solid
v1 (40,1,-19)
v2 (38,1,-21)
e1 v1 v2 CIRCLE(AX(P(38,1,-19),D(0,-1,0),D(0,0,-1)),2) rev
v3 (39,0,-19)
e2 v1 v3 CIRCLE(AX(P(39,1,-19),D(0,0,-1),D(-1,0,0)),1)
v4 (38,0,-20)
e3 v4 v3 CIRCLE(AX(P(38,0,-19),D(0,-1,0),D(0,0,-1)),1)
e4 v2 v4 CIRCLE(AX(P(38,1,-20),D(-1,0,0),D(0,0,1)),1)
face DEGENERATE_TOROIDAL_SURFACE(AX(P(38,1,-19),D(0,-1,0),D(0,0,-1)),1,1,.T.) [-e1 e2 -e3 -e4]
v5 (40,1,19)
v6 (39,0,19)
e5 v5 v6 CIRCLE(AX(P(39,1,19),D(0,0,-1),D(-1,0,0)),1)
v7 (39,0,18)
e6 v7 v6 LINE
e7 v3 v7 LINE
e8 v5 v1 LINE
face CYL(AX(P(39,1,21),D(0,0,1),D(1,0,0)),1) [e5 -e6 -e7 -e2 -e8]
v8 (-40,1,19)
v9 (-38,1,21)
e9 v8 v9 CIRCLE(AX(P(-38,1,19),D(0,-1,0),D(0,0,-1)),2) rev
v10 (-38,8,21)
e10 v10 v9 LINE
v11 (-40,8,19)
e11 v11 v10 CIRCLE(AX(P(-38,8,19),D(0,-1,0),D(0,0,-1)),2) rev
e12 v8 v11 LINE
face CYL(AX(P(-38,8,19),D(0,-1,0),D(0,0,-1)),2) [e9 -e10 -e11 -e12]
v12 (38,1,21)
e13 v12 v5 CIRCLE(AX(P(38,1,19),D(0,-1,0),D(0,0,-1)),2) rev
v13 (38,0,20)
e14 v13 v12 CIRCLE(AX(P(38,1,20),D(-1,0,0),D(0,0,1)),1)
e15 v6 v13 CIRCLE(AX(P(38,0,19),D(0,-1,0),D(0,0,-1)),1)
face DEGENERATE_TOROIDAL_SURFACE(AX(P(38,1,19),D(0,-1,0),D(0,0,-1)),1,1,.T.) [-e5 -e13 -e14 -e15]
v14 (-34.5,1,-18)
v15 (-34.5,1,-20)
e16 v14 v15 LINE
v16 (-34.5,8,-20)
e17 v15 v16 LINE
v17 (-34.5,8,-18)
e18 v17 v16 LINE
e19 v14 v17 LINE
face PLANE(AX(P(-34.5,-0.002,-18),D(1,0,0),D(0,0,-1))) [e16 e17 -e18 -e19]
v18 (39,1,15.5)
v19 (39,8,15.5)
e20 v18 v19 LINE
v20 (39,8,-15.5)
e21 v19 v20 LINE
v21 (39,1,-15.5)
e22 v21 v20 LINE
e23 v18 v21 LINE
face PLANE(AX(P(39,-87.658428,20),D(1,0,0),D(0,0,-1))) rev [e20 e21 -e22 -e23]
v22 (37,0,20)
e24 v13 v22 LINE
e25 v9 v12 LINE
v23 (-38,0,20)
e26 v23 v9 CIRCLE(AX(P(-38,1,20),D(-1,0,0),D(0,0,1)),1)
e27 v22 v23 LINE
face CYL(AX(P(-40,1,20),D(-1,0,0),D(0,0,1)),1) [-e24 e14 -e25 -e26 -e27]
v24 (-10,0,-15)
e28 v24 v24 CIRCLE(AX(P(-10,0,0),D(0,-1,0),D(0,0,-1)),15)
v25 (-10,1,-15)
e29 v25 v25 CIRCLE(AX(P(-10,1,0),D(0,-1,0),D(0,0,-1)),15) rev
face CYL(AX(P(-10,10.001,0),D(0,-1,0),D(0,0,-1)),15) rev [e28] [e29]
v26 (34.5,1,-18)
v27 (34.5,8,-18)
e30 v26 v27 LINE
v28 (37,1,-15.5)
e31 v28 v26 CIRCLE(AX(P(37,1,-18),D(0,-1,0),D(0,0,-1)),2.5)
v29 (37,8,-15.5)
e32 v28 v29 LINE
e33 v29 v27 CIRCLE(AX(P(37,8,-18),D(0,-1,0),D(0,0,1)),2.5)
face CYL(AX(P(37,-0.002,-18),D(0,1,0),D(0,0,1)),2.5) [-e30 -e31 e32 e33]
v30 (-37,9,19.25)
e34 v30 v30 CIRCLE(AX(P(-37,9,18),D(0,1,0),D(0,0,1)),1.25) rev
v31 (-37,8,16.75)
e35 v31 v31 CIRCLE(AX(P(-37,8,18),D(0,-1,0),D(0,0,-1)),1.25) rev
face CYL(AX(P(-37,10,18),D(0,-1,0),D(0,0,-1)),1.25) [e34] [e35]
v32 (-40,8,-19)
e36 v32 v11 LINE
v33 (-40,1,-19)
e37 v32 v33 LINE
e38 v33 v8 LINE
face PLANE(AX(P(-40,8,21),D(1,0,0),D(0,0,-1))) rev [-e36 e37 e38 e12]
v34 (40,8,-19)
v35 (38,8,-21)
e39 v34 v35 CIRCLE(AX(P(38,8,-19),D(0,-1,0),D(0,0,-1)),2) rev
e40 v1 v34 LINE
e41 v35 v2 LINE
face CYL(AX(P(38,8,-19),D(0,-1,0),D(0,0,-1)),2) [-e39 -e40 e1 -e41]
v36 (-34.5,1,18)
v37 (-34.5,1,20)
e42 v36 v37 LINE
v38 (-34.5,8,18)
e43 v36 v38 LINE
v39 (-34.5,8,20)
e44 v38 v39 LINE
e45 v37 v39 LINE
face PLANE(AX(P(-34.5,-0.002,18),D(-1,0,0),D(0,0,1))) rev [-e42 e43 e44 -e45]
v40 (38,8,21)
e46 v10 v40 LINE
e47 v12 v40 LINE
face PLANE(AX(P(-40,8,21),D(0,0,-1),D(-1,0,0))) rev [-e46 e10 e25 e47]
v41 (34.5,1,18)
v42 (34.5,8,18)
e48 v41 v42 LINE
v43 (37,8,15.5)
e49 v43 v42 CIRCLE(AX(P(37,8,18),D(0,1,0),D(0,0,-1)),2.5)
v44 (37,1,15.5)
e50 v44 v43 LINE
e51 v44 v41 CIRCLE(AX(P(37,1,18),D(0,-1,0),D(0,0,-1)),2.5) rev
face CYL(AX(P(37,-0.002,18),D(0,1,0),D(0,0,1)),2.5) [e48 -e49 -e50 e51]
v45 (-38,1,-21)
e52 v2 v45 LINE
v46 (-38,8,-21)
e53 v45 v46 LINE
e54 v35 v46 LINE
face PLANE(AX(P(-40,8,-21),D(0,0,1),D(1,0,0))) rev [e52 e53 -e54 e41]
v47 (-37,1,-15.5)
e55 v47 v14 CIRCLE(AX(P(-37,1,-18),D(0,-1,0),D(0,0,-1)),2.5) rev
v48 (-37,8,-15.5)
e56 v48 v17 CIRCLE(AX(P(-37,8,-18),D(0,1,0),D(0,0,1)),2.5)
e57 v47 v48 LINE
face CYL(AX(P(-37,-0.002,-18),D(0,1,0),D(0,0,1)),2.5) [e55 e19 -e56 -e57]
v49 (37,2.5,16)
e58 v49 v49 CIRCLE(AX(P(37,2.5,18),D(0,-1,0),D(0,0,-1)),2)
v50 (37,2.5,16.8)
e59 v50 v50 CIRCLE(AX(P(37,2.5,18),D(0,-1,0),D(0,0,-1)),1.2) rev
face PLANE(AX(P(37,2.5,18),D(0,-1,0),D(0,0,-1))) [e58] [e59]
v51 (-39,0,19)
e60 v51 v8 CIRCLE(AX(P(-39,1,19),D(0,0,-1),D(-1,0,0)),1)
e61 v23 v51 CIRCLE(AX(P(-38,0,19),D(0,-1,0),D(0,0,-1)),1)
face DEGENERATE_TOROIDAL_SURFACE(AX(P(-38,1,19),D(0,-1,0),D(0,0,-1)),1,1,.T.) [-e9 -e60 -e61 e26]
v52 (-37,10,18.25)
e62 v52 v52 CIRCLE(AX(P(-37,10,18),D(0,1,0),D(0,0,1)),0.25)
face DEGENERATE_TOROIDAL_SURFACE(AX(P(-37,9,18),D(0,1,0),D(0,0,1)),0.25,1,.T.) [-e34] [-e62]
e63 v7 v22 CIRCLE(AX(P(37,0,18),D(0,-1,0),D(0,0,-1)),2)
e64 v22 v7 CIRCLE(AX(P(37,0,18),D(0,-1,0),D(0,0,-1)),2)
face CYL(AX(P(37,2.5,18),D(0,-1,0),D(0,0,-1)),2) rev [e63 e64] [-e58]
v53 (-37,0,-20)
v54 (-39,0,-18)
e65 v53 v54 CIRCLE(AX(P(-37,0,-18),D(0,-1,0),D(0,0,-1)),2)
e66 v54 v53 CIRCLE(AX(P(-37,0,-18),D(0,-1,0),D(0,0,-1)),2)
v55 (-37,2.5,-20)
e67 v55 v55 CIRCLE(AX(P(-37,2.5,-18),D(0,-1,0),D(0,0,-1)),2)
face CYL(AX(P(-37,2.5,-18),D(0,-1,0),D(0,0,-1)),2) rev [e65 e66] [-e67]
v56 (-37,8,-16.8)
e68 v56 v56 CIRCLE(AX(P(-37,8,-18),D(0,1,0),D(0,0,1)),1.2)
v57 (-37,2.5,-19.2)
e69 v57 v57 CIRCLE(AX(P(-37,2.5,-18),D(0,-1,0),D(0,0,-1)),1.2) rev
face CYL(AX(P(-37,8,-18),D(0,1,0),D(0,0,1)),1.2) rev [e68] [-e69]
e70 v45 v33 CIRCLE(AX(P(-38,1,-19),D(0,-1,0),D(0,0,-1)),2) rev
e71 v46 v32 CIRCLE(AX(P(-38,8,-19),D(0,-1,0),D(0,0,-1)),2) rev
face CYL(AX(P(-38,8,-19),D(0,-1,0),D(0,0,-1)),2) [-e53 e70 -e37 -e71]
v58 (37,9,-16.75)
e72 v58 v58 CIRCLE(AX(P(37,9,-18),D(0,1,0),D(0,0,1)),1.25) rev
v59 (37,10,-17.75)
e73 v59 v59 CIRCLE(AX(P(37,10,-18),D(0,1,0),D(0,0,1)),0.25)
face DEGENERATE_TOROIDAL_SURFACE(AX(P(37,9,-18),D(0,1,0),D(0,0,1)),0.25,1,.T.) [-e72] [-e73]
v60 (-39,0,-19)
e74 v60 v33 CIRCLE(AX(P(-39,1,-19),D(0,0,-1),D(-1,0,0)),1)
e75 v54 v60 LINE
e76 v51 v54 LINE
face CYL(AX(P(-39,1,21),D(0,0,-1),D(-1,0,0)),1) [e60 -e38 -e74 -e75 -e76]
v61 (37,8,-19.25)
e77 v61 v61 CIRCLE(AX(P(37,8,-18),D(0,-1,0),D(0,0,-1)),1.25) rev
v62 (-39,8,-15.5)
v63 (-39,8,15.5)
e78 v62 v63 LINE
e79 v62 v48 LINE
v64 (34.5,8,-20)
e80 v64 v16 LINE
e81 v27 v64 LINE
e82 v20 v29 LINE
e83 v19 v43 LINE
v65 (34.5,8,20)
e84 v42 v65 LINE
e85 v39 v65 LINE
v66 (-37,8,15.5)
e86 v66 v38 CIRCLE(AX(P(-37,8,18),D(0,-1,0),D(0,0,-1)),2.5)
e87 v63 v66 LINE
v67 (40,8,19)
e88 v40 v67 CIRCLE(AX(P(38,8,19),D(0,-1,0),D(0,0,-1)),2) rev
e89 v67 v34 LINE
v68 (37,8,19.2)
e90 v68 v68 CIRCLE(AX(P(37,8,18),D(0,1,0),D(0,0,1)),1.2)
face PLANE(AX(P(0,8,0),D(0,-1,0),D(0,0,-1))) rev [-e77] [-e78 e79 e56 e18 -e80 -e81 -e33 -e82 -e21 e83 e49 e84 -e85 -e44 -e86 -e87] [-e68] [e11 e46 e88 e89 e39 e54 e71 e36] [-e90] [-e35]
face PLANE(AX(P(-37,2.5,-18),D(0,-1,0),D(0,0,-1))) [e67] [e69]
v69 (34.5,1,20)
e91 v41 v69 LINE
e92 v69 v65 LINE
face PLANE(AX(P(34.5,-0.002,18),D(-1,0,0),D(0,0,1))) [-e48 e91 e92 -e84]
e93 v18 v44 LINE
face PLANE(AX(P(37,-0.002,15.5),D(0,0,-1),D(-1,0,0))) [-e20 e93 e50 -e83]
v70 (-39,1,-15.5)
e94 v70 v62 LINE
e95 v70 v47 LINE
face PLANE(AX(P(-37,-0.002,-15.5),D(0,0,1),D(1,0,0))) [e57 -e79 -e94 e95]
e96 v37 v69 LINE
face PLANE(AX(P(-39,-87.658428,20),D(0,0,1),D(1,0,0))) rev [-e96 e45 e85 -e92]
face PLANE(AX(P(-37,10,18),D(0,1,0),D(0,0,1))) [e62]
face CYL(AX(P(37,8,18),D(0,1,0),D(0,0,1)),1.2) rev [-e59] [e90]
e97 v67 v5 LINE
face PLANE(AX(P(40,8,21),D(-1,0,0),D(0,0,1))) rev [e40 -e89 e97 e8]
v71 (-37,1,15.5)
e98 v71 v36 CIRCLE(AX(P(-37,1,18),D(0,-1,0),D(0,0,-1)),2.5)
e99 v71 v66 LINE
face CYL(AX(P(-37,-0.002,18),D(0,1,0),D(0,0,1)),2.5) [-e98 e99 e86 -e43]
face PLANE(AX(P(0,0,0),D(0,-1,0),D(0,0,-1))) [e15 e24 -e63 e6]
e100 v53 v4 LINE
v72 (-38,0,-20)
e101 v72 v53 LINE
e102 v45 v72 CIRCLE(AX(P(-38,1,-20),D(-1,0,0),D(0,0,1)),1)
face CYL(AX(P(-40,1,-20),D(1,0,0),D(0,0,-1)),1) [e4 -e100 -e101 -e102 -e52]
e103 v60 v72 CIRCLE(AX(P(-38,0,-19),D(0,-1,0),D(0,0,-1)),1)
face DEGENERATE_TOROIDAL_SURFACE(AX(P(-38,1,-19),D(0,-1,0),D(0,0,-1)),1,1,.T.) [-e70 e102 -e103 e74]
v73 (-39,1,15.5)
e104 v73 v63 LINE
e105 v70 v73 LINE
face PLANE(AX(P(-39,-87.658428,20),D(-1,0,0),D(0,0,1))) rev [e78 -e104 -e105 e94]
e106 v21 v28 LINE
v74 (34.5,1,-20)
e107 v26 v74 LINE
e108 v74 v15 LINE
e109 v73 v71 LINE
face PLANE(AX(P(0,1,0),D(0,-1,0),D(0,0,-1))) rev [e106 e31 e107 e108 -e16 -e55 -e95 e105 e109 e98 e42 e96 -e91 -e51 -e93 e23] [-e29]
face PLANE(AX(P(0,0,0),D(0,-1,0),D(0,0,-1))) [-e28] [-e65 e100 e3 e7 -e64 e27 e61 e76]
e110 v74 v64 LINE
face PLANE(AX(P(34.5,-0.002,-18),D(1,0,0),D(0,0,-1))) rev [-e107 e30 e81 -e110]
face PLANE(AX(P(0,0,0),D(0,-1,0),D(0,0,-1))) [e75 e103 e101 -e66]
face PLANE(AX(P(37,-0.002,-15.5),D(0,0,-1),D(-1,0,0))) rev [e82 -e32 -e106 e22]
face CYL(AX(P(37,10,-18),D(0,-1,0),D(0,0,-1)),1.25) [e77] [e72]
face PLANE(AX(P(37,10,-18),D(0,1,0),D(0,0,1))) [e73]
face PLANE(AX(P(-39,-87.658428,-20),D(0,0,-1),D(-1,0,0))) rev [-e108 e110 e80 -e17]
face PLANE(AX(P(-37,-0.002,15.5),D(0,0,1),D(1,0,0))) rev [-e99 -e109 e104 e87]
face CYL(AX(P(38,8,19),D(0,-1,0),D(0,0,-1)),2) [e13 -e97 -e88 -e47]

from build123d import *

# Parameters (mm, degrees)
SKETCH1_W                                = 80
SKETCH1_H                                = 42
BOSS_EXTRUDE1_DEPTH                      = 8
SKETCH2_W                                = 78
SKETCH2_H                                = 40
CUT_EXTRUDE1_DEPTH                       = 7
FILLET1_R                                = 2
BOSS_EXTRUDE2_REACH                      = 47.88
MIRROR1_AT_THE_SECOND_PLANE_COPY_1_REACH = 47.88
M2_CLEARANCE_HOLE2_D                     = 2.4
SKETCH9_R                                = 2
CUT_EXTRUDE2_DEPTH                       = 2.5
SKETCH11_R                               = 1.25
BOSS_EXTRUDE3_DEPTH                      = 2
FILLET2_R                                = 1
FILLET3_R                                = 1
CUT_EXTRUDE3_REACH                       = 48.271
SKETCH12_R                               = 15


with BuildPart() as part:
    # Sketch1 → Boss-Extrude1 (new body)
    with BuildSketch(Plane(origin=(0, 0, 0), x_dir=(1, 0, 0), z_dir=(0, 1, 0))):
        Rectangle(SKETCH1_W, SKETCH1_H)
    extrude(amount=BOSS_EXTRUDE1_DEPTH)

    # Sketch2 → Cut-Extrude1 (cut)
    with BuildSketch(Plane(origin=(0, 8, 0), x_dir=(1, 0, 0), z_dir=(0, 1, 0))):
        Rectangle(SKETCH2_W, SKETCH2_H)
    extrude(amount=-CUT_EXTRUDE1_DEPTH, mode=Mode.SUBTRACT)

    # Fillet1
    fillet1_edges = [part.edges().sort_by_distance(p)[0] for p in [
        (-39, 4.5, -20),
        (-39, 4.5, 20),
        (39, 4.5, 20),
        (39, 4.5, -20),
        (40, 4, 21),
        (-40, 4, 21),
        (-40, 4, -21),
        (40, 4, -21),
    ]]
    fillet(fillet1_edges, radius=FILLET1_R)

    # Sketch3 → Boss-Extrude2 (add, up to next)
    with BuildSketch(Plane(origin=(0, 8, 0), x_dir=(1, 0, 0), z_dir=(0, 1, 0)), mode=Mode.PRIVATE) as boss_extrude2_sk1:
        with BuildLine():
            Line((-34.5, 18), (-34.5, 20))
            Line((-34.5, 20), (-37, 20))
            ThreePointArc((-37, 20), (-38.414213562, 19.414213562), (-39, 18))
            Line((-39, 18), (-39, 15.5))
            Line((-39, 15.5), (-37, 15.5))
            ThreePointArc((-37, 15.5), (-35.232233047, 16.232233047), (-34.5, 18))
        make_face()
    boss_extrude2_tool1 = extrude(boss_extrude2_sk1.sketch, amount=-BOSS_EXTRUDE2_REACH, mode=Mode.PRIVATE) - part.part
    boss_extrude2 = boss_extrude2_tool1.solids().sort_by_distance((-36.789939, 8, -17.789939))[0]
    add(boss_extrude2)

    # Mirror1: Boss-Extrude2 across plane
    add(boss_extrude2.mirror(Plane.XY))

    # Mirror1 at the second plane: Boss-Extrude2 across plane
    add(boss_extrude2.mirror(Plane(origin=(0, 0, 0), x_dir=(0, 0, 1), z_dir=(1, 0, 0))))

    # Mirror1 at the second plane copy 1 sketc → Mirror1 at the second plane copy 1 (add, up to next)
    with BuildSketch(Plane(origin=(0, 8, 0), x_dir=(-1, 0, 0), z_dir=(0, 1, 0)), mode=Mode.PRIVATE) as mirror1_at_the_second_plane_copy_1_sk1:
        with BuildLine():
            Line((-34.5, 18), (-34.5, 20))
            Line((-34.5, 20), (-37, 20))
            ThreePointArc((-37, 20), (-38.414213562, 19.414213562), (-39, 18))
            Line((-39, 18), (-39, 15.5))
            Line((-39, 15.5), (-37, 15.5))
            ThreePointArc((-37, 15.5), (-35.232233047, 16.232233047), (-34.5, 18))
        make_face()
    mirror1_at_the_second_plane_copy_1_tool1 = extrude(mirror1_at_the_second_plane_copy_1_sk1.sketch, amount=-MIRROR1_AT_THE_SECOND_PLANE_COPY_1_REACH, mode=Mode.PRIVATE) - part.part
    add(mirror1_at_the_second_plane_copy_1_tool1.solids().sort_by_distance((36.789939, 8, 17.789939))[0])

    # M2 Clearance Hole2 (through all)
    with Locations(Plane(origin=(-37, 8, -18), x_dir=(0, 0, 1), z_dir=(0, 1, 0))):
        with Locations((0, 0), (36, 74)):
            Hole(M2_CLEARANCE_HOLE2_D / 2)

    # Sketch9 → Cut-Extrude2 (cut)
    with BuildSketch(Plane.XZ):
        with Locations(Location((-37, -18, 0), (0, 0, 270))):
            Circle(SKETCH9_R)
        with Locations(Location((37, 18, 0), (0, 0, 270))):
            Circle(SKETCH9_R)
    extrude(amount=-CUT_EXTRUDE2_DEPTH, mode=Mode.SUBTRACT)

    # Sketch11 → Boss-Extrude3 (add)
    with BuildSketch(Plane(origin=(0, 8, 0), x_dir=(1, 0, 0), z_dir=(0, 1, 0))):
        with Locations(Location((-37, -18, 0), (0, 0, 90))):
            Circle(SKETCH11_R)
        with Locations(Location((37, 18, 0), (0, 0, 90))):
            Circle(SKETCH11_R)
    extrude(amount=BOSS_EXTRUDE3_DEPTH)

    # Fillet2
    fillet2_edges = [part.edges().sort_by_distance(p)[0] for p in [
        (-37, 10, 19.25),
        (37, 10, -16.75),
    ]]
    fillet(fillet2_edges, radius=FILLET2_R)

    # Fillet3
    fillet3_edges = [part.edges().sort_by_distance(p)[0] for p in [
        (0, 0, -21),
        (40, 0, 0),
        (0, 0, 21),
        (-40, 0, 0),
        (-39.414213562, 0, -20.414213562),
        (-39.414213562, 0, 20.414213562),
        (39.414213562, 0, 20.414213562),
        (39.414213562, 0, -20.414213562),
    ]]
    fillet(fillet3_edges, radius=FILLET3_R - 0.0001)  # a hair under: the kernel refuses the full size

    # Sketch12 → Cut-Extrude3 (cut, up to next)
    with BuildSketch(Plane.XZ, mode=Mode.PRIVATE) as cut_extrude3_sk1:
        with Locations(Location((-10, 0, 0), (0, 0, 270))):
            Circle(SKETCH12_R)
    cut_extrude3_tool1 = extrude(cut_extrude3_sk1.sketch, amount=-CUT_EXTRUDE3_REACH, mode=Mode.PRIVATE) & part.part
    add(cut_extrude3_tool1.solids().sort_by_distance((-10, 0, 0))[0], mode=Mode.SUBTRACT)


solid = part.part
